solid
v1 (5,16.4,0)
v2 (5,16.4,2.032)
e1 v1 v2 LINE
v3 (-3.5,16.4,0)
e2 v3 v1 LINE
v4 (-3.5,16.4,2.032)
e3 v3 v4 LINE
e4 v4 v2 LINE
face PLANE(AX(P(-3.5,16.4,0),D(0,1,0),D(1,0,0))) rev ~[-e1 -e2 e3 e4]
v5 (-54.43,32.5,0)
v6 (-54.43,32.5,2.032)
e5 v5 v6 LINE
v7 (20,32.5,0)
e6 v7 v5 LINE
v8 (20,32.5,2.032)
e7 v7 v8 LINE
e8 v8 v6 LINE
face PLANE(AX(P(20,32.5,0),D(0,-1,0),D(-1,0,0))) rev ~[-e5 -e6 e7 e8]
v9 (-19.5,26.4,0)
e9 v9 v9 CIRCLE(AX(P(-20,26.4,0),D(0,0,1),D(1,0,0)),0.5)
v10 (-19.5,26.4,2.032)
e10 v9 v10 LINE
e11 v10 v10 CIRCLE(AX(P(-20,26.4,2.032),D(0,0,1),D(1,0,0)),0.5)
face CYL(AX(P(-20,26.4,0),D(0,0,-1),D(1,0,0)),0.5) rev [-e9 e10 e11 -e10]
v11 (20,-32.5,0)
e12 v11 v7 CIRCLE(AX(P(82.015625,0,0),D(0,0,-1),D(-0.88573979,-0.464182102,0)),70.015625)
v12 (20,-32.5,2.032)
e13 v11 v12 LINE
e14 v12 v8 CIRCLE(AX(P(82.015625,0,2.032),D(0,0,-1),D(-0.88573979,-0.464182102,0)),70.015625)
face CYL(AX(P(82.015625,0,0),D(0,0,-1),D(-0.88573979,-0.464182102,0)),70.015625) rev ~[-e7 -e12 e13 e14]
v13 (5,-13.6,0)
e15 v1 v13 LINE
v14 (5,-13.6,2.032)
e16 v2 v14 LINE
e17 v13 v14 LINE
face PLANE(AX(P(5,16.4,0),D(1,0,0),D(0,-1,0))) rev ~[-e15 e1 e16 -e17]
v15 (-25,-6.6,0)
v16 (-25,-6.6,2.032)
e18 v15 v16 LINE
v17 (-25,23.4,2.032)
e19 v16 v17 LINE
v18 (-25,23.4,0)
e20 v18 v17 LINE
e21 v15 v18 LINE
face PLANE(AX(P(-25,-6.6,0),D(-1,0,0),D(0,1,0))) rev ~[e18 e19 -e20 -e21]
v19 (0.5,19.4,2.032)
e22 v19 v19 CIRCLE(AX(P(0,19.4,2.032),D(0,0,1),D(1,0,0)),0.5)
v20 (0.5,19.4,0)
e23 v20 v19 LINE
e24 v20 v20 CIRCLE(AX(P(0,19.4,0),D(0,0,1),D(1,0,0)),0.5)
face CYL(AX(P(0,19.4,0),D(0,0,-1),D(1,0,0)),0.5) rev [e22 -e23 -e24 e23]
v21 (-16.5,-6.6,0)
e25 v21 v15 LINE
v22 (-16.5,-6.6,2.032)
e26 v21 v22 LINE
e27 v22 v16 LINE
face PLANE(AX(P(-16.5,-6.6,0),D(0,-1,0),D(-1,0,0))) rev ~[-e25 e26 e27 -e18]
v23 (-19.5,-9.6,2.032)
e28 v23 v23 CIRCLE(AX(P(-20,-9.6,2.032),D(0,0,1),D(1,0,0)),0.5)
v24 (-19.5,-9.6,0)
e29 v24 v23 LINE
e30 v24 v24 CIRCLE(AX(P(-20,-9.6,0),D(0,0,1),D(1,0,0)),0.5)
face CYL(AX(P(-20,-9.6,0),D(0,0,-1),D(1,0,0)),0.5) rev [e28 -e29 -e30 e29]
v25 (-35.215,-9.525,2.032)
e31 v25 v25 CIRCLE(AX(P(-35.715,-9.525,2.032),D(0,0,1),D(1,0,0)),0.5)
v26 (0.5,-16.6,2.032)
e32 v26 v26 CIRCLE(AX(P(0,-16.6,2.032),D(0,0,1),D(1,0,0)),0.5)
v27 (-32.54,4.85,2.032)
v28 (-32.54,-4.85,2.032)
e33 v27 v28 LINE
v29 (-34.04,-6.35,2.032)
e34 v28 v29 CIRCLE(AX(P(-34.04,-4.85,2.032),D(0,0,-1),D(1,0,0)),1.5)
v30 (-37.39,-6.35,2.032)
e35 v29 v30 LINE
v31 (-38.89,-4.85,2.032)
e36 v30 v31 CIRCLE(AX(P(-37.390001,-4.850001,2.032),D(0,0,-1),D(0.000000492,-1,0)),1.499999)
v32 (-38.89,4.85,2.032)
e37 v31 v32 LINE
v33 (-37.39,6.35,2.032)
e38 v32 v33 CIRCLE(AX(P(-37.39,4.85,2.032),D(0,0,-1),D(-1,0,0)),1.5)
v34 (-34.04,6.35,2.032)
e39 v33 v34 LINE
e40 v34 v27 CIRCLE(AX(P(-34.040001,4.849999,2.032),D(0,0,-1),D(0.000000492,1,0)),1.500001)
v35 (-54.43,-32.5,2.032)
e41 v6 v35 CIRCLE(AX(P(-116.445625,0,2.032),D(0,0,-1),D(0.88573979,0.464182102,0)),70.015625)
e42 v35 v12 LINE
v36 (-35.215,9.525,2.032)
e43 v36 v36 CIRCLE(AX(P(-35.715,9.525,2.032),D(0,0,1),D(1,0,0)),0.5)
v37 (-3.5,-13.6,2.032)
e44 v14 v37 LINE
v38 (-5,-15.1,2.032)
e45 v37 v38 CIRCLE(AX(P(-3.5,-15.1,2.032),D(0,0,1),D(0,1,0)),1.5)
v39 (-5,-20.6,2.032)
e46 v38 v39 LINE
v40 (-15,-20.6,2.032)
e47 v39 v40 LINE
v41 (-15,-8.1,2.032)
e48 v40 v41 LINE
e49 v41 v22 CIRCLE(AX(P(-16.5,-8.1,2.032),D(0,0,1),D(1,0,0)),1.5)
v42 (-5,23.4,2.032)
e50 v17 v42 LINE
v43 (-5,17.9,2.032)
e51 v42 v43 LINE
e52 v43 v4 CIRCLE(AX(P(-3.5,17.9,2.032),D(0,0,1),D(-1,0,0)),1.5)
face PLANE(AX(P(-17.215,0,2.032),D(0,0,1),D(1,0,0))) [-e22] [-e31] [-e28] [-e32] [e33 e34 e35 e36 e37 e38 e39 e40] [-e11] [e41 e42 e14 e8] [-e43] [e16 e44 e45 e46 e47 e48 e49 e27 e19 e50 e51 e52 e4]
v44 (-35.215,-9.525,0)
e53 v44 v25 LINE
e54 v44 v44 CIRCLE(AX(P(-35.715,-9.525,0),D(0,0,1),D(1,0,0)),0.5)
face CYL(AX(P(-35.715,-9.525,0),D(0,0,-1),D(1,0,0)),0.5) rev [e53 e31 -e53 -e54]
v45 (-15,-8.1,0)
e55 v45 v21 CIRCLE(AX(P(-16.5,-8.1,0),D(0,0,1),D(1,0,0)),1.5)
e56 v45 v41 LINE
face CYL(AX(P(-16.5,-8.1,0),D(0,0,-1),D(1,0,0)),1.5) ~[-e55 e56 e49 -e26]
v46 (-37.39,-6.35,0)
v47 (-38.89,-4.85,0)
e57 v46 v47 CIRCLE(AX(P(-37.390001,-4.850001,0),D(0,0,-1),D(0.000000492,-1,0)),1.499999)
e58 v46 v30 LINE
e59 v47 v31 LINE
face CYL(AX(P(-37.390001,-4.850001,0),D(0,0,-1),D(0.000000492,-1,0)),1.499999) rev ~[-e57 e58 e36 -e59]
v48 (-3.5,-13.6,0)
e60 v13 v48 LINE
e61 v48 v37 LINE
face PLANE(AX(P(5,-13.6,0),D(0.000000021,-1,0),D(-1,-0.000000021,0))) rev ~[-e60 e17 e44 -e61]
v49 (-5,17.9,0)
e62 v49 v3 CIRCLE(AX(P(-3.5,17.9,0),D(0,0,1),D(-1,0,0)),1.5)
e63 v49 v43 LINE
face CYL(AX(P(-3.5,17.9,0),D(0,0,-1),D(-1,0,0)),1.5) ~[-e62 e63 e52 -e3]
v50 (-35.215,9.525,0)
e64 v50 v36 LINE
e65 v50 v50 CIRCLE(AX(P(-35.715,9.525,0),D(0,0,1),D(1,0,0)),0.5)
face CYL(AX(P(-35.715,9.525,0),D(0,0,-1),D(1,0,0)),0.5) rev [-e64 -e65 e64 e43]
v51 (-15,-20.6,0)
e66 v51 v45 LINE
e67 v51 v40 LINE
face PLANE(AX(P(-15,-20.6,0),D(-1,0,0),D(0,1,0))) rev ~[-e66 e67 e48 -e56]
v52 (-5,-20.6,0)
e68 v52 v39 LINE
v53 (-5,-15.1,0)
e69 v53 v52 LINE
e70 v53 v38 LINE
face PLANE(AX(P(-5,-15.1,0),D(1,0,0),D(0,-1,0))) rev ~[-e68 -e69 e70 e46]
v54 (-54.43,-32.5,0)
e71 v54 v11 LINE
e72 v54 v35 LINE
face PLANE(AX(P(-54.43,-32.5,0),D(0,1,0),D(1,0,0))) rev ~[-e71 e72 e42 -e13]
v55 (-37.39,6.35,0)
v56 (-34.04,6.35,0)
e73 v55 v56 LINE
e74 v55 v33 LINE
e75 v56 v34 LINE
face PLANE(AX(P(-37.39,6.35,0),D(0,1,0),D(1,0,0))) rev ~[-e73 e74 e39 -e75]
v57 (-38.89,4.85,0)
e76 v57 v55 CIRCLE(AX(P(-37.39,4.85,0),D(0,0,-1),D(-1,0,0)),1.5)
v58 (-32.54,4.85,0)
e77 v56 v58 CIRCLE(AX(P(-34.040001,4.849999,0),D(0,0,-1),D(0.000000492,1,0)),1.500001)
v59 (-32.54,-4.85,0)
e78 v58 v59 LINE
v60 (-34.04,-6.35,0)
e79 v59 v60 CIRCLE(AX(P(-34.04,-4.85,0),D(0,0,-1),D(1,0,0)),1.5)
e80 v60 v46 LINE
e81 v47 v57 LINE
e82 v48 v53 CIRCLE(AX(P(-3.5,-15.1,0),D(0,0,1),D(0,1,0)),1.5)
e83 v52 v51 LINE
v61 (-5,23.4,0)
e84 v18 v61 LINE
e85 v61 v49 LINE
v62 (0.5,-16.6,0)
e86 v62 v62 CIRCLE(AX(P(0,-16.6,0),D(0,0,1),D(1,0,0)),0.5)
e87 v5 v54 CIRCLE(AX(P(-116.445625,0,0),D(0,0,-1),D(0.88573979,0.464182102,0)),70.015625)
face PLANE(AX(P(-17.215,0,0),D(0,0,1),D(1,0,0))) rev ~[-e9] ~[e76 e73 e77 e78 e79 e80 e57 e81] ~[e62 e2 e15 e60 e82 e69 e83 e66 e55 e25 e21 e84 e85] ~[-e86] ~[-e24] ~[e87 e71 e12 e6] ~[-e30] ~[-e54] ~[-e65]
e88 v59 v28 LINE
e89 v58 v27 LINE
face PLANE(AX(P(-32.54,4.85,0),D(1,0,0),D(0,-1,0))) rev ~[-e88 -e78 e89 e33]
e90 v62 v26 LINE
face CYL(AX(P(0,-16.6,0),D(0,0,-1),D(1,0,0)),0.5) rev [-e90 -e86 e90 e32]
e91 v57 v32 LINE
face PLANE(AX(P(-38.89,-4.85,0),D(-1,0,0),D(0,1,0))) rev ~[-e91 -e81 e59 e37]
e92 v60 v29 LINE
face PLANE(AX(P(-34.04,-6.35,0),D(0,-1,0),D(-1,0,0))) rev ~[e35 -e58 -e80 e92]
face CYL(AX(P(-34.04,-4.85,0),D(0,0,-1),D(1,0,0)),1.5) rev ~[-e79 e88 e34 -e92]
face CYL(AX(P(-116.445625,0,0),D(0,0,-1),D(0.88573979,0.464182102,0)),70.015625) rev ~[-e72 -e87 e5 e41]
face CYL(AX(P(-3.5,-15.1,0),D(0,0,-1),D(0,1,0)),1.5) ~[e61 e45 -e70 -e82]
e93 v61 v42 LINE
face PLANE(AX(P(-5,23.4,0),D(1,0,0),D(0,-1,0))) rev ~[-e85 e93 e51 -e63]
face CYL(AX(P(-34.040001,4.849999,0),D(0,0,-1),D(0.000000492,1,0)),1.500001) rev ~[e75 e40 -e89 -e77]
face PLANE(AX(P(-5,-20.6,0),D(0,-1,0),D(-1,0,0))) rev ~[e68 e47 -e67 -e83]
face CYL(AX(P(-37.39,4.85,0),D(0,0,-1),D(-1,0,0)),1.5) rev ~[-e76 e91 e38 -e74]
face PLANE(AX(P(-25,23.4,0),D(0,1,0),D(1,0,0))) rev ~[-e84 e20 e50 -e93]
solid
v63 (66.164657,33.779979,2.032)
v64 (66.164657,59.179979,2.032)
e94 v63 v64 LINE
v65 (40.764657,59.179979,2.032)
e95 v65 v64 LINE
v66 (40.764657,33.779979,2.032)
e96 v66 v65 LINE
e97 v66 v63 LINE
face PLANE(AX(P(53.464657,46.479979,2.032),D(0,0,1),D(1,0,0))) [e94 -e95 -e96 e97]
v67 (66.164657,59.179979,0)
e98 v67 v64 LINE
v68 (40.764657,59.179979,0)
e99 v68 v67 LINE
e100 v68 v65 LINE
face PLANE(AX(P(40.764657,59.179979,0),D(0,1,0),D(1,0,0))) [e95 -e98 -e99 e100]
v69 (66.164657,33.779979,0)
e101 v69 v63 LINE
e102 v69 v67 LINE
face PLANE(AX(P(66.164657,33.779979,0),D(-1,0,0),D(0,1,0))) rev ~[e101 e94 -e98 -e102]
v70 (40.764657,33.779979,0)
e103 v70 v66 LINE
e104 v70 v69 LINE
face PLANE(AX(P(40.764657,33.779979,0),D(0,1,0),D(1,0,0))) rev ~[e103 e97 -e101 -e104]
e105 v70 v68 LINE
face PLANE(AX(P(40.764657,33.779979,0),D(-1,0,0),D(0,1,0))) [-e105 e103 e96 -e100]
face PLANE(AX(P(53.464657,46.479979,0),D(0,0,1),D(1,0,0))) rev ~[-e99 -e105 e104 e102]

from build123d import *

# Parameters (mm, degrees)
F0_R     = 0.5
F1_DEPTH = 2.032
F0_W     = 25.4
F0_H     = 25.4


# Not quite as in the source:
# - ends of sketch curves that miss each other by under 0.0002 mm in the source are joined


with BuildPart() as f1:
    # F0 (on Top) → F1 (new body)
    with BuildSketch(Plane.XY):
        with BuildLine():
            ThreePointArc((-54.43, 32.4999997839), (-46.43, -2.161e-07), (-54.43, -32.5000002161))
            Line((-54.43, -32.5000002161), (20, -32.5000002161))
            ThreePointArc((20, -32.5000002161), (12, -2.161e-07), (20, 32.4999997839))
            Line((20, 32.4999997839), (-54.43, 32.4999997839))
        make_face()
        with Locations((-20, -9.6000002161)):
            Circle(F0_R, mode=Mode.SUBTRACT)
        with Locations((0, -16.6)):
            Circle(F0_R, mode=Mode.SUBTRACT)
        with Locations((-35.715, -9.525)):
            Circle(F0_R, mode=Mode.SUBTRACT)
        with BuildLine():
            Line((-32.54, 4.8499995679), (-32.54, -4.85))
            ThreePointArc((-32.54, -4.85), (-32.9793398282, -5.9106601718), (-34.04, -6.35))
            Line((-34.04, -6.35), (-37.39, -6.35))
            ThreePointArc((-37.39, -6.35), (-38.4506601718, -5.9106606039), (-38.89, -4.8500004321))
            Line((-38.89, -4.8500004321), (-38.89, 4.85))
            ThreePointArc((-38.89, 4.85), (-38.4506601718, 5.9106601718), (-37.39, 6.35))
            Line((-37.39, 6.35), (-34.04, 6.35))
            ThreePointArc((-34.04, 6.35), (-32.9793398282, 5.9106597396), (-32.54, 4.8499995679))
        make_face(mode=Mode.SUBTRACT)
        with Locations((-35.715, 9.5249997839)):
            Circle(F0_R, mode=Mode.SUBTRACT)
        with BuildLine():
            Line((-5, -20.6000001803), (-15, -20.6000001803))
            Line((-15, -20.6000001803), (-15, -8.1000002161))
            ThreePointArc((-15, -8.1000002161), (-15.4393398282, -7.0393400443), (-16.5, -6.6000002161))
            Line((-16.5, -6.6000002161), (-25, -6.6000002161))
            Line((-25, -6.6000002161), (-25, 23.3999996036))
            Line((-25, 23.3999996036), (-5, 23.3999996036))
            Line((-5, 23.3999996036), (-5, 17.9))
            ThreePointArc((-5, 17.9), (-4.5606601718, 16.8393398282), (-3.5, 16.4))
            Line((-3.5, 16.4), (5, 16.4))
            Line((5, 16.4), (5, -13.5999998197))
            Line((5, -13.5999998197), (-3.5, -13.6))
            ThreePointArc((-3.5, -13.6), (-4.5606601718, -14.0393398282), (-5, -15.1))
            Line((-5, -15.1), (-5, -20.6000001803))
        make_face(mode=Mode.SUBTRACT)
        with Locations((0, 19.4)):
            Circle(F0_R, mode=Mode.SUBTRACT)
        with Locations((-20, 26.3999997839)):
            Circle(F0_R, mode=Mode.SUBTRACT)
    extrude(amount=F1_DEPTH)


with BuildPart() as f1b:
    # F0 (on Top) → F1, piece 2 (new body)
    with BuildSketch(Plane.XY):
        with Locations((53.4646574736, 46.4799787521)):
            Rectangle(F0_W, F0_H)
    extrude(amount=F1_DEPTH)


solid = Compound([f1.part, f1b.part])
